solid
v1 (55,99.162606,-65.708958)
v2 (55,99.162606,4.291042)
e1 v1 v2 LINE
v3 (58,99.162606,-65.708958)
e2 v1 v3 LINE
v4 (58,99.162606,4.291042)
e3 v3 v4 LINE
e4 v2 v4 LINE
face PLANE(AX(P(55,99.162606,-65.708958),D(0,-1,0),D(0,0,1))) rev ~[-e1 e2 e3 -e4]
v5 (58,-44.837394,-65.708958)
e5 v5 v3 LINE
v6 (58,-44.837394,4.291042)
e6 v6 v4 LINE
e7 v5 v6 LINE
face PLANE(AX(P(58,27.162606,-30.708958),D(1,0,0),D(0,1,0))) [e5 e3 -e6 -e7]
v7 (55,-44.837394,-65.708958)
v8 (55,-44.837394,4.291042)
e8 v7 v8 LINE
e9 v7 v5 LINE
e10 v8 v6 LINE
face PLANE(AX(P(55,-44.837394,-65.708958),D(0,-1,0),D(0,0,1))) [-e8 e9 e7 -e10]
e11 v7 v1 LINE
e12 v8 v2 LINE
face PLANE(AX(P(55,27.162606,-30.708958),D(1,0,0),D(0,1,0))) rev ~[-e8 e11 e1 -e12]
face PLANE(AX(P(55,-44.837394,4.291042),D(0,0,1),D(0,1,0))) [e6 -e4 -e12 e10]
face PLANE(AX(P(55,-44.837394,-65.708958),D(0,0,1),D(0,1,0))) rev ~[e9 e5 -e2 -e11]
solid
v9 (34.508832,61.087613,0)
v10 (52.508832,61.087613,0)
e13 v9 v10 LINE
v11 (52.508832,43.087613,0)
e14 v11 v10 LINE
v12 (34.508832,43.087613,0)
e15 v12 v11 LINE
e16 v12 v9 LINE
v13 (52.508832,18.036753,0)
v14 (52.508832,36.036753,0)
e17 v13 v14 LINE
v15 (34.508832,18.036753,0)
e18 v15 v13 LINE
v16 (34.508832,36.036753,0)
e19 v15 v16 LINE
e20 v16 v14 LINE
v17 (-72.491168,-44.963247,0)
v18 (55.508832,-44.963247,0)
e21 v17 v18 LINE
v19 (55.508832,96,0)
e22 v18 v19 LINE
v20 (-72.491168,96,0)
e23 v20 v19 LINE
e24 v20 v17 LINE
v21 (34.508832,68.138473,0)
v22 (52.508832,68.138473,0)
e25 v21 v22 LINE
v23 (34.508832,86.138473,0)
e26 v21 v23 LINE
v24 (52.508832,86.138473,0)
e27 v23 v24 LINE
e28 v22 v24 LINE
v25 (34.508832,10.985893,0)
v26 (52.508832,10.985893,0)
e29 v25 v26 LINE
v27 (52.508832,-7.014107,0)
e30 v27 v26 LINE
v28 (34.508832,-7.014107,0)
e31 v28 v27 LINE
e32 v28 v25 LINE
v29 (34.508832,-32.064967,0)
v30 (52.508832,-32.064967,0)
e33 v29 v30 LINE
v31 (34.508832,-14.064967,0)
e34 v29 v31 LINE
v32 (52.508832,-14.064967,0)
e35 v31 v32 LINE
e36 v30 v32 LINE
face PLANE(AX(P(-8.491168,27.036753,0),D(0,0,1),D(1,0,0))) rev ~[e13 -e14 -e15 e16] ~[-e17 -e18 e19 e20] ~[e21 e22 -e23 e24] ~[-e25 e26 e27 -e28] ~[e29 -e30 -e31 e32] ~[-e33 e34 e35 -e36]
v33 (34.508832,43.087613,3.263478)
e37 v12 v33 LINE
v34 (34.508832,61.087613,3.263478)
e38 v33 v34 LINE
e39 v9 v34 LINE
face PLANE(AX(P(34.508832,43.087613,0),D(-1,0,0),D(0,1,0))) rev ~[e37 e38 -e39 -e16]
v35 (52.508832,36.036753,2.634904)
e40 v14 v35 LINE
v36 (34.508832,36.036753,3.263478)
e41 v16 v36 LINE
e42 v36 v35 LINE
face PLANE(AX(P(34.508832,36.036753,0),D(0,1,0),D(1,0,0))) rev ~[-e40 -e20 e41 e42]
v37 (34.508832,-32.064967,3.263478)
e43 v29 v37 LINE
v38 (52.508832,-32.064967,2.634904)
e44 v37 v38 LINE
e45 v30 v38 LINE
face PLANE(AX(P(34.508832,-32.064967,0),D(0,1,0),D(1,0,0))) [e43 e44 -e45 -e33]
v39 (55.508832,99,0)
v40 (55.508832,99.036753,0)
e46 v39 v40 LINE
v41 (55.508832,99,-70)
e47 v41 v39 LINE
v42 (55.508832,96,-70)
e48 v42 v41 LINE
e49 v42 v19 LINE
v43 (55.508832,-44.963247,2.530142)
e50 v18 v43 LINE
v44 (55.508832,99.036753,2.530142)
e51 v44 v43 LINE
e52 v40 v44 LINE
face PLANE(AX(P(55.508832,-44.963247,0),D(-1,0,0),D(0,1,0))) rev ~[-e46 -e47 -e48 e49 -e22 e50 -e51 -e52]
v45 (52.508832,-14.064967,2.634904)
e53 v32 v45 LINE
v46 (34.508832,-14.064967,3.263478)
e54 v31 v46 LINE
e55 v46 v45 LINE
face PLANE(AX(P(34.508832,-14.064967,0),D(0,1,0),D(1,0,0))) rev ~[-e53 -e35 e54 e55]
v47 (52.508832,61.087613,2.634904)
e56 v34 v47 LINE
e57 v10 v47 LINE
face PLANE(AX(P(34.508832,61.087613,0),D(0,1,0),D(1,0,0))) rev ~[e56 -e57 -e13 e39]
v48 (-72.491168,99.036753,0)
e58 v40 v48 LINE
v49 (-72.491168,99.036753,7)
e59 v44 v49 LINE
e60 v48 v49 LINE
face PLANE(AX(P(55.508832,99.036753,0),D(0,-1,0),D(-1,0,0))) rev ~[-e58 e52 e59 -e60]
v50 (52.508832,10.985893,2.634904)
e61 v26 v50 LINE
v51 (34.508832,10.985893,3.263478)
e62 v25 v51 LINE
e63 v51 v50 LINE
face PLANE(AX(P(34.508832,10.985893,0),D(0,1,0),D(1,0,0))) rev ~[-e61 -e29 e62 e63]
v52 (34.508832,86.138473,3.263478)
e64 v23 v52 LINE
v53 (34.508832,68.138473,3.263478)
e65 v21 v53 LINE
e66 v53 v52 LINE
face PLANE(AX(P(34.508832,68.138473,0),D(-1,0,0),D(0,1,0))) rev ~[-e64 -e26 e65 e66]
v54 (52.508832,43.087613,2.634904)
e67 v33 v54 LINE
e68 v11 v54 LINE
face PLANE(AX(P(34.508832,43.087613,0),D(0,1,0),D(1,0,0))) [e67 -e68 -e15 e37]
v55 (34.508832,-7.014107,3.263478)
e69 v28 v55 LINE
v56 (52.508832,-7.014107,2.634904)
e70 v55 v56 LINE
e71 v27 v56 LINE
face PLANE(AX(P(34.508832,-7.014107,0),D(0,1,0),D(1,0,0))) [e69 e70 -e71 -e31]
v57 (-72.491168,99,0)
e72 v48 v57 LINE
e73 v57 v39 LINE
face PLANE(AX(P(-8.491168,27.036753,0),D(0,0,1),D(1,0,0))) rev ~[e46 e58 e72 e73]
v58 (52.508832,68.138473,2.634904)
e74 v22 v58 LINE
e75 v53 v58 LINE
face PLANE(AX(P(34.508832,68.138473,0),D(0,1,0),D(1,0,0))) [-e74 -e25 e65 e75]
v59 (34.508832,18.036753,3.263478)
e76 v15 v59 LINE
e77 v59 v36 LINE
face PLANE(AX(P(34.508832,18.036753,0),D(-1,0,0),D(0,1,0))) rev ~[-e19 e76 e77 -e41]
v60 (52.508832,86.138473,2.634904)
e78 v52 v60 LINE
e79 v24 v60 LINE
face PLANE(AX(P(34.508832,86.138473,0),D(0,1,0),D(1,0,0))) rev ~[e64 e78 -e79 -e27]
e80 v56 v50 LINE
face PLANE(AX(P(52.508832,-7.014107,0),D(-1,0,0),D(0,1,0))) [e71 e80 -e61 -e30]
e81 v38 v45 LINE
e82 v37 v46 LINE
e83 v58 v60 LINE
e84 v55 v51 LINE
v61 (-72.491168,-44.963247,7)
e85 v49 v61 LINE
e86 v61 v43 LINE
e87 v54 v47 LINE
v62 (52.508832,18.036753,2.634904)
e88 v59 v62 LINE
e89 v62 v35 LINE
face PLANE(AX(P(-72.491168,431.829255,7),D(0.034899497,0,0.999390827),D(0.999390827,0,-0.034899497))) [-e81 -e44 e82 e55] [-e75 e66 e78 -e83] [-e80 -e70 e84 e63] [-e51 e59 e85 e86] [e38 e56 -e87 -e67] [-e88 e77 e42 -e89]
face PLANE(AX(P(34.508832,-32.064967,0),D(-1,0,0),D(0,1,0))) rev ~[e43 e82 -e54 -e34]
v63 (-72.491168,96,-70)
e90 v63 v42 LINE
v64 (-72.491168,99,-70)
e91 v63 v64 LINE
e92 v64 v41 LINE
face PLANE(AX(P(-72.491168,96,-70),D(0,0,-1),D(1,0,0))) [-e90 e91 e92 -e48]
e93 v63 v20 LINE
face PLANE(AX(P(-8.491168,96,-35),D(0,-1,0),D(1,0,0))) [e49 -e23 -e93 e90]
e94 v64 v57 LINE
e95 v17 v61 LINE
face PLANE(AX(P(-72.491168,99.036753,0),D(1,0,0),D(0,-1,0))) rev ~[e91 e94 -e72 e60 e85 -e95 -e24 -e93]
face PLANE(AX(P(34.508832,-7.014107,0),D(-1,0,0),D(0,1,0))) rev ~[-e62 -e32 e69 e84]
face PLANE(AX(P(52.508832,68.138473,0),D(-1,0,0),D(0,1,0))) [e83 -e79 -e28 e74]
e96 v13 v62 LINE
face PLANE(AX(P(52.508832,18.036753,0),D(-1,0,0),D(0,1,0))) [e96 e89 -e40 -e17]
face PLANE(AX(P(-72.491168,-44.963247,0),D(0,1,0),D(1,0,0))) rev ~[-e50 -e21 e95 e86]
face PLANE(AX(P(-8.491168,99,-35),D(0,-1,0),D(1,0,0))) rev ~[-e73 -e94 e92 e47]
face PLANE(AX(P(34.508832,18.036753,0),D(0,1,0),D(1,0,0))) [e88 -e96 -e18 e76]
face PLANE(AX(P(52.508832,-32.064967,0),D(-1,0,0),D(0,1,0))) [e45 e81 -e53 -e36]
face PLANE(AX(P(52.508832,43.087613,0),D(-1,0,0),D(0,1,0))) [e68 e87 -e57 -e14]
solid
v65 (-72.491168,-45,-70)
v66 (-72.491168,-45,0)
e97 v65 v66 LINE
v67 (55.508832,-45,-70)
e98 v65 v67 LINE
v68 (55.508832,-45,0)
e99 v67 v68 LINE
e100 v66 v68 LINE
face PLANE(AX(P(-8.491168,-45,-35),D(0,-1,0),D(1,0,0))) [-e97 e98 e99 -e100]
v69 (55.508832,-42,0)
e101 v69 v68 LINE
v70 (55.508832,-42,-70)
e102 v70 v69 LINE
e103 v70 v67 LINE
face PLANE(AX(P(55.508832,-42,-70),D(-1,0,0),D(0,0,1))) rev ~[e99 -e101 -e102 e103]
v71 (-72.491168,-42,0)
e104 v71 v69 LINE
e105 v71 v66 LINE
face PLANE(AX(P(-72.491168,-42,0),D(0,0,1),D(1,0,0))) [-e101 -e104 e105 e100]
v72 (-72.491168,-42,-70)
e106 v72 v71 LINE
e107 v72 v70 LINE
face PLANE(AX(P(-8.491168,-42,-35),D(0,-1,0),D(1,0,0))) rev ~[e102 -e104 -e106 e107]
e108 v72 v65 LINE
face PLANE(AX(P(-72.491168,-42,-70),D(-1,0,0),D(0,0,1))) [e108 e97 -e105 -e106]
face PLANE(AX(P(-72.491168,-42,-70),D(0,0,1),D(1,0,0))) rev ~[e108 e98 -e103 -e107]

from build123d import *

# Parameters (mm, degrees)
F0_W        = 18
F0_H        = 18
F3_DEPTH    = 7
F4_T1_DEPTH = 809.5850048039
F5_START    = 42
F1_W        = 128
F1_H        = 70
F5_DEPTH    = 3
F6_START    = -96
F6_DEPTH    = 3
F7_START    = 55
F2_W        = 144
F2_H        = 70
F7_DEPTH    = 3


# Not quite as in the source:
# - a fillet or chamfer that OpenCascade refuses, or shapes differently, is made with other operations: its cross-section is extruded or revolved along the edge and cut away or added


with BuildPart() as f3:
    # F0 (on Top) → F3 (new body)
    with BuildSketch(Plane.XY):
        Polygon((52.5088317096, 99.0367529392), (-72.4911682904, 99.0367529392), (-72.4911682904, -44.9632470608), (52.5088317096, -44.9632470608), (55.5088317096, -44.9632470608), (55.5088317096, 99.0367529392), align=None)
        with Locations((43.5088317096, -23.0649668574)):
            Rectangle(F0_W, F0_H, mode=Mode.SUBTRACT)
        with Locations((43.5088317096, 1.9858930409)):
            Rectangle(F0_W, F0_H, mode=Mode.SUBTRACT)
        with Locations((43.5088317096, 27.0367529392)):
            Rectangle(F0_W, F0_H, mode=Mode.SUBTRACT)
        with Locations((43.5088317096, 52.0876128376)):
            Rectangle(F0_W, F0_H, mode=Mode.SUBTRACT)
        with Locations((43.5088317096, 77.1384727359)):
            Rectangle(F0_W, F0_H, mode=Mode.SUBTRACT)
    extrude(amount=F3_DEPTH)

    # F4: chamfer of 128 x 4.4698584949 on 1 edges, made by hand

    # F4_s2 → F4_t1 (cut)
    with BuildSketch(Plane.XZ.offset(-431.8292553412)):
        Polygon((-72.4911682904, 7), (55.5088317096, 2.5301415051), (55.5088317096, 7), align=None)
    extrude(amount=F4_T1_DEPTH, mode=Mode.SUBTRACT)

    # F1 (on Front) → F6 (join)
    with BuildSketch(Plane.XZ.offset(F6_START)):
        with Locations((-8.4911682904, -35)):
            Rectangle(F1_W, F1_H)
    extrude(amount=-F6_DEPTH)


with BuildPart() as f5:
    # F1 (on Front) → F5 (new body)
    with BuildSketch(Plane.XZ.offset(F5_START)):
        with Locations((-8.4911682904, -35)):
            Rectangle(F1_W, F1_H)
    extrude(amount=F5_DEPTH)


with BuildPart() as f7:
    # F2 (on Right) → F7 (new body)
    with BuildSketch(Plane.YZ.offset(F7_START)):
        with Locations((27.1626058966, -30.7089579414)):
            Rectangle(F2_W, F2_H)
    extrude(amount=F7_DEPTH)


solid = Compound([f3.part, f5.part, f7.part])
